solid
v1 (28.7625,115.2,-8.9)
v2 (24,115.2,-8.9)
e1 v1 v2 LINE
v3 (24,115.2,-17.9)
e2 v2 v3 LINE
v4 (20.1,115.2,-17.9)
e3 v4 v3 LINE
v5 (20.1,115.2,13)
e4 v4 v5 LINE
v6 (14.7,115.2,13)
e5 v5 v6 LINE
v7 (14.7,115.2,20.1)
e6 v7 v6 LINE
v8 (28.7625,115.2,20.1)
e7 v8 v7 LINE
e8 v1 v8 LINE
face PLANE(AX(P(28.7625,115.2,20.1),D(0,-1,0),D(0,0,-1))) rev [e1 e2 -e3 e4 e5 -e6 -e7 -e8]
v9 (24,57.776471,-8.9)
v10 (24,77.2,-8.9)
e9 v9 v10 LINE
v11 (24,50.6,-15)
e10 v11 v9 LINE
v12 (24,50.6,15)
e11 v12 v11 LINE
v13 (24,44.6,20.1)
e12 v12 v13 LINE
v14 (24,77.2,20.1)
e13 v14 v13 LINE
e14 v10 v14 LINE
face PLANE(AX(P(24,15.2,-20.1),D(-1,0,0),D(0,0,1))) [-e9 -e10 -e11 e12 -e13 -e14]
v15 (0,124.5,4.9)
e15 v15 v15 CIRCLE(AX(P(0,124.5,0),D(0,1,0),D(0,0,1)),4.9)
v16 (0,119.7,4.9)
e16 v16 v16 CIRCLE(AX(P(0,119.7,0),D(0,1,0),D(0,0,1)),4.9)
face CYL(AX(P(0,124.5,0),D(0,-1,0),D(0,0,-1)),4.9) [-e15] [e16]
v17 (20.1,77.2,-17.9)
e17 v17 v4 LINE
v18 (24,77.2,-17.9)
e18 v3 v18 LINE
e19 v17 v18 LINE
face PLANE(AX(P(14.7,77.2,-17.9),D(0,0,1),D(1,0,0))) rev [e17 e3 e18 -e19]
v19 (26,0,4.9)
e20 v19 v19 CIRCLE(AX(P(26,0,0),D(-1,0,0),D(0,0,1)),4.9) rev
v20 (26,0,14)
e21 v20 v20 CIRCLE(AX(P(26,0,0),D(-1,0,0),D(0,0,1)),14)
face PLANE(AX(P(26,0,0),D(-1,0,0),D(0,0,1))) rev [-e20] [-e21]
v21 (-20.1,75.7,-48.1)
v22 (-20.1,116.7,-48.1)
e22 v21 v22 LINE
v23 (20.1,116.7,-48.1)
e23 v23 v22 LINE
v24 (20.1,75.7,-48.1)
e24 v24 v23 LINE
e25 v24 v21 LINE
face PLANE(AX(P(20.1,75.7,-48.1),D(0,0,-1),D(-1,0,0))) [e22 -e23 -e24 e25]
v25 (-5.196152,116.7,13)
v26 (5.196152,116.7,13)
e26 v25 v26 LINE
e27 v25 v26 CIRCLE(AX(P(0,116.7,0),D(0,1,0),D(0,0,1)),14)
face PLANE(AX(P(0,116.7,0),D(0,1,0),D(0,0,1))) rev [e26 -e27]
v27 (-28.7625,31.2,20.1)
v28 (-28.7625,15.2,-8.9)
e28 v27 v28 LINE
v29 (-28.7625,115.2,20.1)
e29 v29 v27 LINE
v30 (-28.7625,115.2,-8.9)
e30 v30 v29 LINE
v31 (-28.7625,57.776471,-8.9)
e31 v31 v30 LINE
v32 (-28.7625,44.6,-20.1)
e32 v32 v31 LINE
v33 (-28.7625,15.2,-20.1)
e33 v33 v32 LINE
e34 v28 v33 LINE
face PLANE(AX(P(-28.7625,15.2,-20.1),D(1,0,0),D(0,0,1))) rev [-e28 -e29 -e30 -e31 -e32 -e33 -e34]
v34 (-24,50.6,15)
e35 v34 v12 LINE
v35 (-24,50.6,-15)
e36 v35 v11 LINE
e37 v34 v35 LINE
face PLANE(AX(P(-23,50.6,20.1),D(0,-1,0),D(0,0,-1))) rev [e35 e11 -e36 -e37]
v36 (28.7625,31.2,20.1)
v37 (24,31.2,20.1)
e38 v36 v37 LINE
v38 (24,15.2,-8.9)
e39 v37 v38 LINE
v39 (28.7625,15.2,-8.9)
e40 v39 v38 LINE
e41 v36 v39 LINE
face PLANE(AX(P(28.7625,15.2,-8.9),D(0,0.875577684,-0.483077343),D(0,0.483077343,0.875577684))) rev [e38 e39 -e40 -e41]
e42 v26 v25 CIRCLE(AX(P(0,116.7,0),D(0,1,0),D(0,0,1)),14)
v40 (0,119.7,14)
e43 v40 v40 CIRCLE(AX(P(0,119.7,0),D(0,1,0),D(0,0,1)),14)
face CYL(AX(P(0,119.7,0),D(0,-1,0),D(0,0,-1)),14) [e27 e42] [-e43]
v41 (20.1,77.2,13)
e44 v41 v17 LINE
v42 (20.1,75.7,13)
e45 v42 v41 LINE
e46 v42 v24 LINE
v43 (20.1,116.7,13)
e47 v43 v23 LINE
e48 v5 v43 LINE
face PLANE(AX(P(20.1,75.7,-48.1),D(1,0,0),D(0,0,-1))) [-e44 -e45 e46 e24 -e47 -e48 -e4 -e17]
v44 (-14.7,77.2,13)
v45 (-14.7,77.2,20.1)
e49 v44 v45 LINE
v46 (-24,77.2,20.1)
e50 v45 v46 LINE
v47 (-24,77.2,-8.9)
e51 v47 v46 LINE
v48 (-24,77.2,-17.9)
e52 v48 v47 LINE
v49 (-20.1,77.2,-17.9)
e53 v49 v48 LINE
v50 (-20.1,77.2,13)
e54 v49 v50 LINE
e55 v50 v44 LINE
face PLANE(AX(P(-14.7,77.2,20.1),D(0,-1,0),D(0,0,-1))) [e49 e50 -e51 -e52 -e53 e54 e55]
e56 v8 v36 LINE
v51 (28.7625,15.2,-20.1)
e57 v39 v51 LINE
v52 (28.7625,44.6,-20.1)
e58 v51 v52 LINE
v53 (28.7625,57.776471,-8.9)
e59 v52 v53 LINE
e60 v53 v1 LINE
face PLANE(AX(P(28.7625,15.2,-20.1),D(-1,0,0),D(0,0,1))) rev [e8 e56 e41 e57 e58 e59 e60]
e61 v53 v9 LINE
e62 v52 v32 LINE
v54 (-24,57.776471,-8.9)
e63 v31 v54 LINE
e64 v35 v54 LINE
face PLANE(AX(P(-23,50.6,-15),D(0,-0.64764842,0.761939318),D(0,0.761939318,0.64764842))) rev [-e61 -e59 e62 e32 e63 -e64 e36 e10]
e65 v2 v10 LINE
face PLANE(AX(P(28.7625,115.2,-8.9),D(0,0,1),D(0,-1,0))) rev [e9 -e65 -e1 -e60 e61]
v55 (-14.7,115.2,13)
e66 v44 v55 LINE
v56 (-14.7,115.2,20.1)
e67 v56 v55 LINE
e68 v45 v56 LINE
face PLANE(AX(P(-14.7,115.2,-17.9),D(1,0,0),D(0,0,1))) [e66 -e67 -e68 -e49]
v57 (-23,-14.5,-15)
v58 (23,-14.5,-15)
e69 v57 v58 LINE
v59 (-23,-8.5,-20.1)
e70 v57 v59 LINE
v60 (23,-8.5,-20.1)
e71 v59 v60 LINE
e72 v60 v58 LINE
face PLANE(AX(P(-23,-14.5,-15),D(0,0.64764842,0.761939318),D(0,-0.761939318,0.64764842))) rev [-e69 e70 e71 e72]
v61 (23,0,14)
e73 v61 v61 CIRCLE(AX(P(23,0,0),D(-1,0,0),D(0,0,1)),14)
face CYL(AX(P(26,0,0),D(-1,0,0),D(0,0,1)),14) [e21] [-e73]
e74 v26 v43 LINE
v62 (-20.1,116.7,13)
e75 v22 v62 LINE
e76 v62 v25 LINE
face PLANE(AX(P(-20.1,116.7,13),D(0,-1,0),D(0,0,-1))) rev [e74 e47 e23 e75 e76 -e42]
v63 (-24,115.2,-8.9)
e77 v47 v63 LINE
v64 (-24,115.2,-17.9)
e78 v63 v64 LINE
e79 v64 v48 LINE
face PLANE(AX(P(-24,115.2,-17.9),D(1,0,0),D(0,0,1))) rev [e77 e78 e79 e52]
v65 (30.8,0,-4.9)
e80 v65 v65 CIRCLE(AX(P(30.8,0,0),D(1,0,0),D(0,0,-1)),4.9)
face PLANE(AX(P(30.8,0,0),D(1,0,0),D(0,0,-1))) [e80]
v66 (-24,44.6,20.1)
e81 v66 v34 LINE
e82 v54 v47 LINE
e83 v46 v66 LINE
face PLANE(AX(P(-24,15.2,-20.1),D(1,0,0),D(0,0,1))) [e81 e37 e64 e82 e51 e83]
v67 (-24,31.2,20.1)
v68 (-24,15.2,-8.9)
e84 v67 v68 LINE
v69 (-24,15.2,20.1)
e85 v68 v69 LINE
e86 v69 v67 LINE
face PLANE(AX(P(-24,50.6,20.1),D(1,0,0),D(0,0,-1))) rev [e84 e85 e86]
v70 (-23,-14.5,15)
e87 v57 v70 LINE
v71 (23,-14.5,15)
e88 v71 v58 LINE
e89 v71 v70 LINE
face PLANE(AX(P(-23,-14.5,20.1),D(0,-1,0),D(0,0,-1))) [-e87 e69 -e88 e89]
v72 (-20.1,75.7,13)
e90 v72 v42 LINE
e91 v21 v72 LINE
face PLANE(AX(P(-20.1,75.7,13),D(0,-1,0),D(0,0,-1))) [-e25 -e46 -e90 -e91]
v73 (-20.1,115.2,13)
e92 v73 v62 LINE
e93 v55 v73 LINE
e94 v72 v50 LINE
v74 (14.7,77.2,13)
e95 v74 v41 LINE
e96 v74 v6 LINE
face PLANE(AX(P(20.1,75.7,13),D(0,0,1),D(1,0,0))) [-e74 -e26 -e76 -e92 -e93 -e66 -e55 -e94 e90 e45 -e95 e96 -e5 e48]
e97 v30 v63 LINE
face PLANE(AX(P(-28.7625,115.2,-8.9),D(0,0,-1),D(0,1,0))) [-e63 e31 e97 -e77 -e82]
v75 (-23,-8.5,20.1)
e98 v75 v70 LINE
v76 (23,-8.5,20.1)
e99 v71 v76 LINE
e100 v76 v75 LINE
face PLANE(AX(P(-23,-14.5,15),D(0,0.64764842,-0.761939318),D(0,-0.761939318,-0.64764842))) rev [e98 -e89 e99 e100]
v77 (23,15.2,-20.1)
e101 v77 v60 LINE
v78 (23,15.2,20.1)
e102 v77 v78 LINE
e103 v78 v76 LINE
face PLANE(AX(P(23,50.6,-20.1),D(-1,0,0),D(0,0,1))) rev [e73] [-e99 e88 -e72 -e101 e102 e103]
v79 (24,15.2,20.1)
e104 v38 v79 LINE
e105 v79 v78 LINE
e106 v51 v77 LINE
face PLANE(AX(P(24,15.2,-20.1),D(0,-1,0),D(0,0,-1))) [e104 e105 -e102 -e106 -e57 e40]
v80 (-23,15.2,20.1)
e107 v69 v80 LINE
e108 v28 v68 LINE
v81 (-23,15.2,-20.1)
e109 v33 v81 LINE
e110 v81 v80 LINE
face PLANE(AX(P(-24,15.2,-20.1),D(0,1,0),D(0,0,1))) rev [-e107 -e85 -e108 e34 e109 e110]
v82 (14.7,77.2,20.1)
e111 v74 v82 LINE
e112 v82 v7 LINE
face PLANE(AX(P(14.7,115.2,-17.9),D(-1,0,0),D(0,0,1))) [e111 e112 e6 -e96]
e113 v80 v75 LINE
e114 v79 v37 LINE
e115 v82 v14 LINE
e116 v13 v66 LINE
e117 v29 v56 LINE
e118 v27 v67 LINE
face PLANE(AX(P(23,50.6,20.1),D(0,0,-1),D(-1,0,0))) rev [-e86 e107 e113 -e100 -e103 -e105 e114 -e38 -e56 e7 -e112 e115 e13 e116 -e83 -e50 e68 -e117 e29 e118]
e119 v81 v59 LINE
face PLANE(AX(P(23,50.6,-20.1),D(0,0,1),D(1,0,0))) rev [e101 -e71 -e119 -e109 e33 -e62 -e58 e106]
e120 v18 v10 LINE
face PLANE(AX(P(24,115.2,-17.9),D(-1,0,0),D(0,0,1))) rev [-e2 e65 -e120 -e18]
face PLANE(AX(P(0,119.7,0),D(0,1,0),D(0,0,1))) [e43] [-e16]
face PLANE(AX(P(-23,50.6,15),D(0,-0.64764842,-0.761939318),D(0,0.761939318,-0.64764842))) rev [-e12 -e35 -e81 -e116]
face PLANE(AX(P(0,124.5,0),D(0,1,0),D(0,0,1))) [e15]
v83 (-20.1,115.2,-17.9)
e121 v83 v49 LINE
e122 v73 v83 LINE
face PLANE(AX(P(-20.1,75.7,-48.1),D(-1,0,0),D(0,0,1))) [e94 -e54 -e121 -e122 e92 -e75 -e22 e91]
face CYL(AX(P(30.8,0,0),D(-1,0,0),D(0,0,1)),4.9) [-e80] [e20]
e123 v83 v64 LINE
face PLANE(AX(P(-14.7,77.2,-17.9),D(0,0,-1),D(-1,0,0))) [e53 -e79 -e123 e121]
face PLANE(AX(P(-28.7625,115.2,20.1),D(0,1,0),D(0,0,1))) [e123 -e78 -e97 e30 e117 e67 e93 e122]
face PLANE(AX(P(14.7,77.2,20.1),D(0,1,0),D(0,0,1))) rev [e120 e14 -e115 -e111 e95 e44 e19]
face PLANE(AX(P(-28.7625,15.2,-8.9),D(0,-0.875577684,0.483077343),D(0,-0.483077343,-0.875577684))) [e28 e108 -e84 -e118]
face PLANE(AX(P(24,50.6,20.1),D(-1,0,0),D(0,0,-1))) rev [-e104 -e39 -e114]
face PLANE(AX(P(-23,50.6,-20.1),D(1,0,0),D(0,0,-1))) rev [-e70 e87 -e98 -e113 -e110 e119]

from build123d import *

# Parameters (mm, degrees)
SKETCH1_W                 = 46
SKETCH1_H                 = 40.2
BOSS_EXTRUDE1_DEPTH       = 65.1
SKETCH3_R                 = 14
BOSS_EXTRUDE2_DEPTH       = 3
SKETCH4_R                 = 4.9
BOSS_EXTRUDE3_DEPTH       = 4.8
SKETCH7_W                 = 40.2
SKETCH7_H                 = 35.4
BOSS_EXTRUDE6_DEPTH       = 1
CHAMFER1_SIZE             = 6
CHAMFER1_SIZE2            = 5.1
MIRROR3_START             = 44.200099823
MIRROR3_OUTLINE_W         = 50
MIRROR3_OUTLINE_H         = 11
MIRROR3_DEPTH             = 3.885890521
CHAMFER1_OF_MIRROR8_SIZE2 = 5.1
CHAMFER1_OF_MIRROR8_SIZE  = 6
BOSS_EXTRUDE7_DEPTH       = 4.7625
SKETCH9_W                 = 40.2
SKETCH9_H                 = 61.1
BOSS_EXTRUDE8_DEPTH       = 41
SKETCH10_W                = 38
SKETCH10_H                = 38
BOSS_EXTRUDE9_DEPTH       = 9.3
SKETCH11_R                = 14
BOSS_EXTRUDE10_DEPTH      = 3
SKETCH12_R                = 4.9
BOSS_EXTRUDE11_DEPTH      = 4.8


# Read off the part's stored shape, not the designer's step: Mirror3
with BuildPart() as part:
    # Sketch1 → Boss-Extrude1 (new body)
    with BuildSketch(Plane(origin=(0, -14.5, 0), x_dir=(-1, 0, 0), z_dir=(0, 1, 0))):
        Rectangle(SKETCH1_W, SKETCH1_H)
    extrude(amount=BOSS_EXTRUDE1_DEPTH)

    # Sketch3 → Boss-Extrude2 (add)
    with BuildSketch(Plane.ZY.offset(-23)):
        Circle(SKETCH3_R)
    extrude(amount=-BOSS_EXTRUDE2_DEPTH)

    # Sketch4 → Boss-Extrude3 (add)
    with BuildSketch(Plane(origin=(26, 0, 0), x_dir=(0, 0, -1), z_dir=(1, 0, 0))):
        with Locations(Location((0, 0, 0), (0, 0, 180))):
            Circle(SKETCH4_R)
    extrude(amount=BOSS_EXTRUDE3_DEPTH)

    # Sketch7 → Boss-Extrude6 (add)
    with BuildSketch(Plane.ZY.offset(23)):
        with Locations((0, 32.9)):
            Rectangle(SKETCH7_W, SKETCH7_H)
    boss_extrude6 = extrude(amount=BOSS_EXTRUDE6_DEPTH)

    # Mirror1: Boss-Extrude6 across plane
    add(boss_extrude6.mirror(Plane(origin=(0, 0, 0), x_dir=(0, 0, 1), z_dir=(1, 0, 0))))

    # Chamfer1
    chamfer1_edges = [part.edges().sort_by_distance(p)[0] for p in [
        (0, 50.6, 20.1),
    ]]
    chamfer1_side = [part.faces().sort_by_distance(p)[0] for p in [
        (0, 18.392982971, 20.1),
    ]]
    chamfer(chamfer1_edges, length=CHAMFER1_SIZE, length2=CHAMFER1_SIZE2, reference=chamfer1_side[0])

    # Mirror3 outline → Mirror3 (cut)
    with BuildSketch(Plane(origin=(0, 0, 0), x_dir=(1, 0, 0), z_dir=(0, 0.6476484200955404, -0.7619393177594594)).offset(MIRROR3_START)):
        with Locations((0, -24.5)):
            Rectangle(MIRROR3_OUTLINE_W, MIRROR3_OUTLINE_H)
    mirror3 = extrude(amount=MIRROR3_DEPTH, mode=Mode.SUBTRACT)

    # Mirror8: Mirror3 across plane
    add(mirror3.mirror(Plane.ZX.offset(18.05)), mode=Mode.SUBTRACT)

    # Chamfer1 of Mirror8
    chamfer1_of_mirror8_edges = [part.edges().sort_by_distance(p)[0] for p in [
        (0, -14.5, 20.1),
    ]]
    chamfer(chamfer1_of_mirror8_edges, length=CHAMFER1_OF_MIRROR8_SIZE, length2=CHAMFER1_OF_MIRROR8_SIZE2)

    # Sketch8 → Boss-Extrude7 (add)
    with BuildSketch(Plane(origin=(24, 0, 0), x_dir=(0, 0, -1), z_dir=(1, 0, 0))):
        Polygon((20.1, 15.2), (8.9, 15.2), (-20.1, 31.2), (-20.1, 115.2), (8.9, 115.2), (8.9, 57.776470588), (20.1, 44.6), align=None)
    boss_extrude7 = extrude(amount=BOSS_EXTRUDE7_DEPTH)

    # Mirror4: Boss-Extrude7 across plane
    add(boss_extrude7.mirror(Plane(origin=(0, 0, 0), x_dir=(0, 0, 1), z_dir=(1, 0, 0))))



with BuildPart() as body_2:
    # Sketch9 → Boss-Extrude8 (new body)
    with BuildSketch(Plane(origin=(0, 116.7, 0), x_dir=(-1, 0, 0), z_dir=(0, 1, 0))):
        with Locations((0, -17.55)):
            Rectangle(SKETCH9_W, SKETCH9_H)
    extrude(amount=-BOSS_EXTRUDE8_DEPTH)


with BuildPart() as part_1:
    add(part.part)

    add(body_2.part)  # Boss-Extrude9 merges body 2
    # Sketch10 → Boss-Extrude9 (add)
    with BuildSketch(Plane.ZY.offset(-24)):
        with Locations((1.1, 96.2)):
            Rectangle(SKETCH10_W, SKETCH10_H)
    boss_extrude9 = extrude(amount=BOSS_EXTRUDE9_DEPTH)

    # Mirror6: Boss-Extrude9 across plane
    add(boss_extrude9.mirror(Plane(origin=(0, 0, 0), x_dir=(0, 0, 1), z_dir=(1, 0, 0))))

    # Sketch11 → Boss-Extrude10 (add)
    with BuildSketch(Plane(origin=(0, 116.7, 0), x_dir=(-1, 0, 0), z_dir=(0, 1, 0))):
        with Locations(Location((0, 0, 0), (0, 0, 68.213210702))):
            Circle(SKETCH11_R)
    extrude(amount=BOSS_EXTRUDE10_DEPTH)

    # Sketch12 → Boss-Extrude11 (add)
    with BuildSketch(Plane(origin=(0, 119.7, 0), x_dir=(1, 0, 0), z_dir=(0, 1, 0))):
        with Locations(Location((0, 0, 0), (0, 0, 270))):
            Circle(SKETCH12_R)
    extrude(amount=BOSS_EXTRUDE11_DEPTH)


solid = part_1.part
